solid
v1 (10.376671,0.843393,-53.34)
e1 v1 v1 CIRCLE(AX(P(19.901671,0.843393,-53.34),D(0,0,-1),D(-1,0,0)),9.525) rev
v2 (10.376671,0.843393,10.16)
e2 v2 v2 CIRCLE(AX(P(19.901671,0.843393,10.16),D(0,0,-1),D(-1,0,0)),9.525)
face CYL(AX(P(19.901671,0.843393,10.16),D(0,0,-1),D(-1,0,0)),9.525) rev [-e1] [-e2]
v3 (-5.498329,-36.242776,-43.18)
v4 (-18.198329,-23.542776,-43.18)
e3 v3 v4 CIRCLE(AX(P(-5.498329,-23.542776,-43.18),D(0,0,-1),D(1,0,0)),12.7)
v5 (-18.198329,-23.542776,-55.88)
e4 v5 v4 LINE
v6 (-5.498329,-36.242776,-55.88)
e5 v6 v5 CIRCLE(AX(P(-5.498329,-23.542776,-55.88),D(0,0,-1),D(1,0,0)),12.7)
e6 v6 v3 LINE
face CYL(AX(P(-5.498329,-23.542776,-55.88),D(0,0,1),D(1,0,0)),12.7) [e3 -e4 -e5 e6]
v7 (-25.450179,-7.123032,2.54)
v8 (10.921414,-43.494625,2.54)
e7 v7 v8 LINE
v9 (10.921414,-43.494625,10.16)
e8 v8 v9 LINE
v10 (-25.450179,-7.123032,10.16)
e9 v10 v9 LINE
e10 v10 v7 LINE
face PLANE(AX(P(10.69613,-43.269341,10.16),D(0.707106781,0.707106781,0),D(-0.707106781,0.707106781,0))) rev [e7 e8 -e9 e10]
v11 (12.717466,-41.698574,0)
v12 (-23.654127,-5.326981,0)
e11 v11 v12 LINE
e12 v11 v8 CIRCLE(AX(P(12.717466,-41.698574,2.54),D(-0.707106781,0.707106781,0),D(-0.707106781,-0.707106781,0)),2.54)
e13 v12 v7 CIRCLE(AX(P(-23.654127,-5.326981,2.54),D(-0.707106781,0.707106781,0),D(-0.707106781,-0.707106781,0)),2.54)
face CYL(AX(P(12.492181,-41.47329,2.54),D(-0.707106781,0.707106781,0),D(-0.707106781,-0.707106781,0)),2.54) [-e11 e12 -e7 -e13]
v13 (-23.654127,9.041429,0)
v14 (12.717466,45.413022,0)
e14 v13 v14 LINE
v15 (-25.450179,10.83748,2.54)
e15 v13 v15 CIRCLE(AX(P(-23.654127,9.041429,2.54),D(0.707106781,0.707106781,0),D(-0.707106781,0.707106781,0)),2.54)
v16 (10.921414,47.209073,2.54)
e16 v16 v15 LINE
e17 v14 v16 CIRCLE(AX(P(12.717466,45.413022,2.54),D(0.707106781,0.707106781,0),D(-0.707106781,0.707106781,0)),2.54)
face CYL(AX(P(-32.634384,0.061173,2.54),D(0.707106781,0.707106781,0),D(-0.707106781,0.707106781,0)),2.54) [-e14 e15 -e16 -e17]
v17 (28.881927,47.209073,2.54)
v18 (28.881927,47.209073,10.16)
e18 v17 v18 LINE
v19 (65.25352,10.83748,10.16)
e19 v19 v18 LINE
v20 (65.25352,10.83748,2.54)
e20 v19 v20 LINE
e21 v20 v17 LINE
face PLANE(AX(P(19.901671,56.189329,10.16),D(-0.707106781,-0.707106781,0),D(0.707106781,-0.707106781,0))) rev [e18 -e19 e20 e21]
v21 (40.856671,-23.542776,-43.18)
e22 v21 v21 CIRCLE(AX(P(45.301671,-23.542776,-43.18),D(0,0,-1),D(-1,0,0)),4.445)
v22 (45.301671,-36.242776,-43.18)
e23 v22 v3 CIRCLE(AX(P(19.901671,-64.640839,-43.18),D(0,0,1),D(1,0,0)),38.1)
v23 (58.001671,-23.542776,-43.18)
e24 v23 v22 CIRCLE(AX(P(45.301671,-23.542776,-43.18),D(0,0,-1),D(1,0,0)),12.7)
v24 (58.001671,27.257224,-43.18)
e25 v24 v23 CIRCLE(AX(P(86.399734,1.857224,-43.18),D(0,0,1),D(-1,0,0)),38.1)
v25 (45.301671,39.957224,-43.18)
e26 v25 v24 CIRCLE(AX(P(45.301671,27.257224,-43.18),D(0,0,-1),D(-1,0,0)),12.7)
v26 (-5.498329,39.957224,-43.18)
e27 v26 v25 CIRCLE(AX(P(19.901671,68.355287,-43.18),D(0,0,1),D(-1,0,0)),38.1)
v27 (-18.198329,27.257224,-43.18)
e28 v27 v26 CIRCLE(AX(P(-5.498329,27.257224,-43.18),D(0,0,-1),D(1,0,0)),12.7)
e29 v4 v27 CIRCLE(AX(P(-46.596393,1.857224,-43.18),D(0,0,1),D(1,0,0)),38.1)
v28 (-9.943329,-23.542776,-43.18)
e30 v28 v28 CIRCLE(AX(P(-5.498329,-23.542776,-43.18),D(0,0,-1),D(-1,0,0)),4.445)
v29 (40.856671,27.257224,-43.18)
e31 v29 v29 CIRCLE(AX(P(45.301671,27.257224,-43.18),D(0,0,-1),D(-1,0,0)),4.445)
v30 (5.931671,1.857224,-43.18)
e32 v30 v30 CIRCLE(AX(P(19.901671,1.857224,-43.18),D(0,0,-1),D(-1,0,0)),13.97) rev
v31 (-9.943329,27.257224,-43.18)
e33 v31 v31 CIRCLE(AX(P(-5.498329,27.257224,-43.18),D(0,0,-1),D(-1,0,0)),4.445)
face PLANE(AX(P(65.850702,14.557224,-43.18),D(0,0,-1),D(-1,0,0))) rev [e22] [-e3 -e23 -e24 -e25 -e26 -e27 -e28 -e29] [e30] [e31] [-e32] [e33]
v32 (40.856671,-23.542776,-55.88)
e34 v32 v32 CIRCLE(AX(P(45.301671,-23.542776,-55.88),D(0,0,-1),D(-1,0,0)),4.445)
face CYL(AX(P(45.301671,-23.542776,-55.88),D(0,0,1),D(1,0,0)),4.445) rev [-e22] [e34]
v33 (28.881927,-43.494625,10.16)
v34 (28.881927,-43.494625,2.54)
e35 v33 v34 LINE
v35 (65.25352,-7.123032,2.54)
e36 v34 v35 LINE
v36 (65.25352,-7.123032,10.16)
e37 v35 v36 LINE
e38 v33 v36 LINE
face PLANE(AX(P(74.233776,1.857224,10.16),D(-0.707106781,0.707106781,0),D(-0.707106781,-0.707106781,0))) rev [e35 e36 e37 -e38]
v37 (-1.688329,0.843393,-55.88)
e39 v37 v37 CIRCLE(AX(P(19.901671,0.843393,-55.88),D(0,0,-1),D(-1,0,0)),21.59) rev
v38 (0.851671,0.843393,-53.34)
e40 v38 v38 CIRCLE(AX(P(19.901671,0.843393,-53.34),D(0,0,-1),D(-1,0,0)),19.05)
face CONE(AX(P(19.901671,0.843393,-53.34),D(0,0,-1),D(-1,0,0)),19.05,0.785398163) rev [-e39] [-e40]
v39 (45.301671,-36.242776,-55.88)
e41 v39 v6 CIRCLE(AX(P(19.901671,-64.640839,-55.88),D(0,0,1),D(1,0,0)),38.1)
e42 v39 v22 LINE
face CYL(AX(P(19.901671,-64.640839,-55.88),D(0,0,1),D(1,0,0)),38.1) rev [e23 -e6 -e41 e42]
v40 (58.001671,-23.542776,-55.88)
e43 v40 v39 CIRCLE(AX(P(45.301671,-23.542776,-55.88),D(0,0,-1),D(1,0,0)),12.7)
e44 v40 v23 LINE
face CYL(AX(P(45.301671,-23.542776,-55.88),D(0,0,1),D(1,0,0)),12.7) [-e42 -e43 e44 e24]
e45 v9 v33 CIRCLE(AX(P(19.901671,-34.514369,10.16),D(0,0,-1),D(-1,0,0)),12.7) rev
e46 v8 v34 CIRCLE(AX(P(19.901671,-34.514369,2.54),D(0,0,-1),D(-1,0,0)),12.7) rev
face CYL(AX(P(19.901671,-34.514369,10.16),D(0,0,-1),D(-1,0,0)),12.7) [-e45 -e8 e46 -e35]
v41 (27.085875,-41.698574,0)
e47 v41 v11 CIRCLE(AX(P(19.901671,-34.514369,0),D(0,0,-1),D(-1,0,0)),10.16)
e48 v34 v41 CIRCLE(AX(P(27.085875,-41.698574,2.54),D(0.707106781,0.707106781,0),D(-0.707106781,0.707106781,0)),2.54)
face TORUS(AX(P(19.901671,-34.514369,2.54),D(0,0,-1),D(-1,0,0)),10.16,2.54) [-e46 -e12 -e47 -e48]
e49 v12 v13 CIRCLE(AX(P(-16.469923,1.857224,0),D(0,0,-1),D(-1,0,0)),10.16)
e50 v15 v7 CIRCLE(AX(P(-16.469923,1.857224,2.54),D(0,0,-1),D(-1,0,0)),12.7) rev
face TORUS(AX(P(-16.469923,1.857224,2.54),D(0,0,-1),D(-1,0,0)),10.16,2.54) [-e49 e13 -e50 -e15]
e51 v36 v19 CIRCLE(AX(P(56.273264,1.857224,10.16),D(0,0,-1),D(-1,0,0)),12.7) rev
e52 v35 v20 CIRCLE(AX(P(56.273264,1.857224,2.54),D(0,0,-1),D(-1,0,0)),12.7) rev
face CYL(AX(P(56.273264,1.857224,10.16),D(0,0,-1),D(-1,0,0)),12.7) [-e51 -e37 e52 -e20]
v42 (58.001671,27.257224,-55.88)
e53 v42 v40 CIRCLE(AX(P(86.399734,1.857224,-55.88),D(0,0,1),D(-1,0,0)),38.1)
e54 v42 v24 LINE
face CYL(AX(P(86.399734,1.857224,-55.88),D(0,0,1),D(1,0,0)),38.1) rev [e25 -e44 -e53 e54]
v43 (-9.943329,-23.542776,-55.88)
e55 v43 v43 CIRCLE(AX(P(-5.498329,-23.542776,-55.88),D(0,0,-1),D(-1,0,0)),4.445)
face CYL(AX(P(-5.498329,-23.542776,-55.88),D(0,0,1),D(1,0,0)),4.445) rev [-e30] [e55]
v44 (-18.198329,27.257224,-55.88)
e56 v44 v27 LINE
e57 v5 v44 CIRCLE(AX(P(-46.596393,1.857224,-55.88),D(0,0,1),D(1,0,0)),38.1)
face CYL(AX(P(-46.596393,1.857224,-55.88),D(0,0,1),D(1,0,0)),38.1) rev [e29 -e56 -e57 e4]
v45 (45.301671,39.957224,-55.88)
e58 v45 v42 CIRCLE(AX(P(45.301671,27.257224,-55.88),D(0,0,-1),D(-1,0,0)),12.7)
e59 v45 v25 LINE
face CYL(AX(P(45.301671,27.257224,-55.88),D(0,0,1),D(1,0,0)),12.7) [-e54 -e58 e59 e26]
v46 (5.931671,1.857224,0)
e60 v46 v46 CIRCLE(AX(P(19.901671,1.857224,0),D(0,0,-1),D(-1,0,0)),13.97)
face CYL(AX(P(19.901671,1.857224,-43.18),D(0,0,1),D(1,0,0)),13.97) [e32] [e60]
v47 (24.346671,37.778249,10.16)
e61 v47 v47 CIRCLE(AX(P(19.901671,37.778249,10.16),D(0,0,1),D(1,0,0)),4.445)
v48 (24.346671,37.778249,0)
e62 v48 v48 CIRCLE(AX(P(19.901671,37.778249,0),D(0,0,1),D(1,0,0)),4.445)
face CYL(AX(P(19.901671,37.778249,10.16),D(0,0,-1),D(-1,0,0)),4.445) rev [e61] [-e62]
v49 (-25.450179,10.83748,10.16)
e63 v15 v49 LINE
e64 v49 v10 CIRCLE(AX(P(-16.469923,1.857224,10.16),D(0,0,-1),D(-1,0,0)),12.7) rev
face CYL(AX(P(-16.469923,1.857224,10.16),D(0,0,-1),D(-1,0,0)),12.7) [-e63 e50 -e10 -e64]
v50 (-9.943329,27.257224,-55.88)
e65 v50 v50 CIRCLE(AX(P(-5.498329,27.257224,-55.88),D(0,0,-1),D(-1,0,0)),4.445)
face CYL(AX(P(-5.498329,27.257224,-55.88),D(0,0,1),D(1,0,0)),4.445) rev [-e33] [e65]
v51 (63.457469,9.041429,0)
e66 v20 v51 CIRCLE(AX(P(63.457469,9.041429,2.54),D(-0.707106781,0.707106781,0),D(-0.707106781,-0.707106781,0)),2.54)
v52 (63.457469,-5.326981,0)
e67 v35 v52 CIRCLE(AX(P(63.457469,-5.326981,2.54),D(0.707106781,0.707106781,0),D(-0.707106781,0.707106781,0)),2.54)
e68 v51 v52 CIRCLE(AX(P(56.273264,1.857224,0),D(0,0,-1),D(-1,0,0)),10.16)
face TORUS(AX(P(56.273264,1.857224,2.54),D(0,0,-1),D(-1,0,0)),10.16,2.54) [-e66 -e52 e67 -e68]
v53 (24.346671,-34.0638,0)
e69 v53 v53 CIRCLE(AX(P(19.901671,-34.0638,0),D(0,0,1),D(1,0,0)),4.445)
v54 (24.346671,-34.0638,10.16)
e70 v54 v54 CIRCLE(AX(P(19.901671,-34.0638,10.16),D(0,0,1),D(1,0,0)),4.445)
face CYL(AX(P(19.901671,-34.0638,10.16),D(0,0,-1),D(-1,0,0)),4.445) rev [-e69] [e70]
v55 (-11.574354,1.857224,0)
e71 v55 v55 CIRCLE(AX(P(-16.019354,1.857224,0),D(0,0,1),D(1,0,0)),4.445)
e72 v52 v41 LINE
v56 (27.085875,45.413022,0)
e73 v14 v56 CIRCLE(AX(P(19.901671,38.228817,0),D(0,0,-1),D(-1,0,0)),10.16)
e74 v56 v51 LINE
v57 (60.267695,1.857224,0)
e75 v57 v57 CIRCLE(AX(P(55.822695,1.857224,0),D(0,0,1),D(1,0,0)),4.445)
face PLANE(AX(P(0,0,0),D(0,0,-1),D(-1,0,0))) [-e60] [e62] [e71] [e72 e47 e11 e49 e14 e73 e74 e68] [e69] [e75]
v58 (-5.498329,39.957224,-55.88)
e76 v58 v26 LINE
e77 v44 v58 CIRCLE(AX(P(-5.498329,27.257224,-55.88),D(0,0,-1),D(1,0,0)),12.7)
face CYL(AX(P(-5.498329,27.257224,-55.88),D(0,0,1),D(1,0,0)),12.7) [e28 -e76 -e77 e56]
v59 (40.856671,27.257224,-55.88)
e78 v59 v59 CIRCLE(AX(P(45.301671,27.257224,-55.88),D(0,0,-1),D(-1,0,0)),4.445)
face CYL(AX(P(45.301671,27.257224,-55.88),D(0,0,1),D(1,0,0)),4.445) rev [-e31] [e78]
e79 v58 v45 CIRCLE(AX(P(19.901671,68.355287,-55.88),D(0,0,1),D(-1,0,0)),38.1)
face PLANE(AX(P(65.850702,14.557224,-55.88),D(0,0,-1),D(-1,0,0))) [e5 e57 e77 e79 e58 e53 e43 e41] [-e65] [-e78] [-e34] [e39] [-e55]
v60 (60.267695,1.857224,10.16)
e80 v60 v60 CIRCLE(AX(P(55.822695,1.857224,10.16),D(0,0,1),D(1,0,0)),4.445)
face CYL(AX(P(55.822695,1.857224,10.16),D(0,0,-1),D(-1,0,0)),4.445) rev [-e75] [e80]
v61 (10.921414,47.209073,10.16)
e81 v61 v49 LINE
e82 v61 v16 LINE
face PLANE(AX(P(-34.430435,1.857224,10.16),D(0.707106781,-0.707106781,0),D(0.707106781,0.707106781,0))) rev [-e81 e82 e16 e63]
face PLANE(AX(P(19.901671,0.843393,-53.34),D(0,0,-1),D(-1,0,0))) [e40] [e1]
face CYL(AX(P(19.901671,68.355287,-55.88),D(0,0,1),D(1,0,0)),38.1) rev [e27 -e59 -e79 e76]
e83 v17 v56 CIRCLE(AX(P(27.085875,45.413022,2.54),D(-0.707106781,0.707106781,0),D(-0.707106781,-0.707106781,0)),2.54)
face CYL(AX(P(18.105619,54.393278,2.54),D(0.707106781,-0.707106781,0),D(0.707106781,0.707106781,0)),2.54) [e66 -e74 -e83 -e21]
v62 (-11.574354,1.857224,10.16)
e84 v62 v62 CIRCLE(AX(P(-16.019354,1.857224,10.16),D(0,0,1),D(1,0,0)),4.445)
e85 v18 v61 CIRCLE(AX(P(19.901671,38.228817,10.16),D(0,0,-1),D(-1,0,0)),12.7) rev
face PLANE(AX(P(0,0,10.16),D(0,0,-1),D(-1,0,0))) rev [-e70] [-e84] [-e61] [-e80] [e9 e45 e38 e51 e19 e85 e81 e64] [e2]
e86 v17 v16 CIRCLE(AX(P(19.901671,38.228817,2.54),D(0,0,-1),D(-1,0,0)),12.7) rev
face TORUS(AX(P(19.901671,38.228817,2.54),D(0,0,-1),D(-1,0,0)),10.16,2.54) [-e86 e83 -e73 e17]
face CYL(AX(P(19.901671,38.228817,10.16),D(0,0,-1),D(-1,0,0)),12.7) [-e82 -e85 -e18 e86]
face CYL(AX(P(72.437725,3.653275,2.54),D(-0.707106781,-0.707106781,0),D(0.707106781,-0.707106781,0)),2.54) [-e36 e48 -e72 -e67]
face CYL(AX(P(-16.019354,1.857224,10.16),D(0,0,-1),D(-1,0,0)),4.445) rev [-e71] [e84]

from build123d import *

# Parameters (mm, degrees)
SKETCH1_R           = 4.445
BOSS_EXTRUDE1_DEPTH = 10.16
FILLET1_R           = 12.7
SKETCH2_R           = 13.97
BOSS_EXTRUDE2_DEPTH = 43.18
SKETCH4_R           = 4.445
BOSS_EXTRUDE3_DEPTH = 12.7
SKETCH5_R           = 9.525
CUT_EXTRUDE2_DEPTH  = 109.223551539
SKETCH6_R           = 19.05
CUT_EXTRUDE3_DEPTH  = 2.54
CHAMFER1_SIZE       = 2.54
FILLET2_R           = 2.54


with BuildPart() as part:
    # Sketch1 → Boss-Extrude1 (new body)
    with BuildSketch(Plane.XY):
        Polygon((10.696130127, -43.269340837), (-25.224894357, -7.348316353), (-34.430434771, 1.857224061), (-25.224894357, 11.062764475), (10.696130127, 46.98378896), (19.901670541, 56.189329374), (29.107210955, 46.98378896), (65.02823544, 11.062764475), (74.233775854, 1.857224061), (65.02823544, -7.348316353), (29.107210955, -43.269340837), (19.901670541, -52.474881251), align=None)
        with Locations((-16.019353943, 1.857224061)):
            Circle(SKETCH1_R, mode=Mode.SUBTRACT)
        with Locations((19.901670541, 37.778248545)):
            Circle(SKETCH1_R, mode=Mode.SUBTRACT)
        with Locations((19.901670541, -34.063800423)):
            Circle(SKETCH1_R, mode=Mode.SUBTRACT)
        with Locations((55.822695025, 1.857224061)):
            Circle(SKETCH1_R, mode=Mode.SUBTRACT)
    extrude(amount=BOSS_EXTRUDE1_DEPTH)

    # Fillet1
    fillet1_edges = [part.edges().sort_by_distance(p)[0] for p in [
        (-34.430434771, 1.857224061, 5.08),
        (19.901670541, 56.189329374, 5.08),
        (74.233775854, 1.857224061, 5.08),
        (19.901670541, -52.474881251, 5.08),
    ]]
    fillet(fillet1_edges, radius=FILLET1_R)

    # Sketch2 → Boss-Extrude2 (add)
    with BuildSketch(Plane.XY):
        with Locations((19.901670541, 1.857224061)):
            Circle(SKETCH2_R)
    extrude(amount=-BOSS_EXTRUDE2_DEPTH)

    # Sketch4 → Boss-Extrude3 (add)
    with BuildSketch(Plane(origin=(0, 0, -43.18), x_dir=(-1, 0, 0), z_dir=(0, 0, -1))):
        with BuildLine():
            ThreePointArc((-45.301670541, 39.957224061), (-54.281926662, 36.237480182), (-58.001670541, 27.257224061))
            ThreePointArc((-58.001670541, 27.257224061), (-48.299733855, 1.857224061), (-58.001670541, -23.542775939))
            ThreePointArc((-58.001670541, -23.542775939), (-54.281926662, -32.52303206), (-45.301670541, -36.242775939))
            ThreePointArc((-45.301670541, -36.242775939), (-19.901670541, -26.540839253), (5.498329459, -36.242775939))
            ThreePointArc((5.498329459, -36.242775939), (14.47858558, -32.52303206), (18.198329459, -23.542775939))
            ThreePointArc((18.198329459, -23.542775939), (8.496392773, 1.857224061), (18.198329459, 27.257224061))
            ThreePointArc((18.198329459, 27.257224061), (14.47858558, 36.237480182), (5.498329459, 39.957224061))
            ThreePointArc((5.498329459, 39.957224061), (-19.901670541, 30.255287375), (-45.301670541, 39.957224061))
        make_face()
        with Locations((-45.301670541, 27.257224061)):
            Circle(SKETCH4_R, mode=Mode.SUBTRACT)
        with Locations((5.498329459, 27.257224061)):
            Circle(SKETCH4_R, mode=Mode.SUBTRACT)
        with Locations((5.498329459, -23.542775939)):
            Circle(SKETCH4_R, mode=Mode.SUBTRACT)
        with Locations((-45.301670541, -23.542775939)):
            Circle(SKETCH4_R, mode=Mode.SUBTRACT)
    extrude(amount=BOSS_EXTRUDE3_DEPTH)

    # Sketch5 → Cut-Extrude2 (cut, through all)
    with BuildSketch(Plane(origin=(0, 0, -55.88), x_dir=(-1, 0, 0), z_dir=(0, 0, -1))):
        with Locations((-19.901670541, 0.843392699)):
            Circle(SKETCH5_R)
    extrude(amount=-CUT_EXTRUDE2_DEPTH, mode=Mode.SUBTRACT)

    # Sketch6 → Cut-Extrude3 (cut)
    with BuildSketch(Plane(origin=(0, 0, -55.88), x_dir=(-1, 0, 0), z_dir=(0, 0, -1))):
        with Locations((-19.901670541, 0.843392699)):
            Circle(SKETCH6_R)
    extrude(amount=-CUT_EXTRUDE3_DEPTH, mode=Mode.SUBTRACT)

    # Chamfer1
    chamfer1_edges = [part.edges().sort_by_distance(p)[0] for p in [
        (38.951670541, 0.843392699, -55.88),
    ]]
    chamfer(chamfer1_edges, length=CHAMFER1_SIZE - 0.0001)  # a hair under: the kernel refuses the full size

    # Fillet2
    fillet2_edges = [part.edges().sort_by_distance(p)[0] for p in [
        (47.067723198, -25.308828595, 0),
        (-7.264382115, -25.308828595, 0),
        (-7.264382115, 29.023276718, 0),
        (47.067723198, 29.023276718, 0),
        (19.901670541, 50.928817132, 0),
        (-29.169922529, 1.857224061, 0),
        (68.973263612, 1.857224061, 0),
        (19.901670541, -47.214369009, 0),
    ]]
    fillet(fillet2_edges, radius=FILLET2_R)


solid = part.part
